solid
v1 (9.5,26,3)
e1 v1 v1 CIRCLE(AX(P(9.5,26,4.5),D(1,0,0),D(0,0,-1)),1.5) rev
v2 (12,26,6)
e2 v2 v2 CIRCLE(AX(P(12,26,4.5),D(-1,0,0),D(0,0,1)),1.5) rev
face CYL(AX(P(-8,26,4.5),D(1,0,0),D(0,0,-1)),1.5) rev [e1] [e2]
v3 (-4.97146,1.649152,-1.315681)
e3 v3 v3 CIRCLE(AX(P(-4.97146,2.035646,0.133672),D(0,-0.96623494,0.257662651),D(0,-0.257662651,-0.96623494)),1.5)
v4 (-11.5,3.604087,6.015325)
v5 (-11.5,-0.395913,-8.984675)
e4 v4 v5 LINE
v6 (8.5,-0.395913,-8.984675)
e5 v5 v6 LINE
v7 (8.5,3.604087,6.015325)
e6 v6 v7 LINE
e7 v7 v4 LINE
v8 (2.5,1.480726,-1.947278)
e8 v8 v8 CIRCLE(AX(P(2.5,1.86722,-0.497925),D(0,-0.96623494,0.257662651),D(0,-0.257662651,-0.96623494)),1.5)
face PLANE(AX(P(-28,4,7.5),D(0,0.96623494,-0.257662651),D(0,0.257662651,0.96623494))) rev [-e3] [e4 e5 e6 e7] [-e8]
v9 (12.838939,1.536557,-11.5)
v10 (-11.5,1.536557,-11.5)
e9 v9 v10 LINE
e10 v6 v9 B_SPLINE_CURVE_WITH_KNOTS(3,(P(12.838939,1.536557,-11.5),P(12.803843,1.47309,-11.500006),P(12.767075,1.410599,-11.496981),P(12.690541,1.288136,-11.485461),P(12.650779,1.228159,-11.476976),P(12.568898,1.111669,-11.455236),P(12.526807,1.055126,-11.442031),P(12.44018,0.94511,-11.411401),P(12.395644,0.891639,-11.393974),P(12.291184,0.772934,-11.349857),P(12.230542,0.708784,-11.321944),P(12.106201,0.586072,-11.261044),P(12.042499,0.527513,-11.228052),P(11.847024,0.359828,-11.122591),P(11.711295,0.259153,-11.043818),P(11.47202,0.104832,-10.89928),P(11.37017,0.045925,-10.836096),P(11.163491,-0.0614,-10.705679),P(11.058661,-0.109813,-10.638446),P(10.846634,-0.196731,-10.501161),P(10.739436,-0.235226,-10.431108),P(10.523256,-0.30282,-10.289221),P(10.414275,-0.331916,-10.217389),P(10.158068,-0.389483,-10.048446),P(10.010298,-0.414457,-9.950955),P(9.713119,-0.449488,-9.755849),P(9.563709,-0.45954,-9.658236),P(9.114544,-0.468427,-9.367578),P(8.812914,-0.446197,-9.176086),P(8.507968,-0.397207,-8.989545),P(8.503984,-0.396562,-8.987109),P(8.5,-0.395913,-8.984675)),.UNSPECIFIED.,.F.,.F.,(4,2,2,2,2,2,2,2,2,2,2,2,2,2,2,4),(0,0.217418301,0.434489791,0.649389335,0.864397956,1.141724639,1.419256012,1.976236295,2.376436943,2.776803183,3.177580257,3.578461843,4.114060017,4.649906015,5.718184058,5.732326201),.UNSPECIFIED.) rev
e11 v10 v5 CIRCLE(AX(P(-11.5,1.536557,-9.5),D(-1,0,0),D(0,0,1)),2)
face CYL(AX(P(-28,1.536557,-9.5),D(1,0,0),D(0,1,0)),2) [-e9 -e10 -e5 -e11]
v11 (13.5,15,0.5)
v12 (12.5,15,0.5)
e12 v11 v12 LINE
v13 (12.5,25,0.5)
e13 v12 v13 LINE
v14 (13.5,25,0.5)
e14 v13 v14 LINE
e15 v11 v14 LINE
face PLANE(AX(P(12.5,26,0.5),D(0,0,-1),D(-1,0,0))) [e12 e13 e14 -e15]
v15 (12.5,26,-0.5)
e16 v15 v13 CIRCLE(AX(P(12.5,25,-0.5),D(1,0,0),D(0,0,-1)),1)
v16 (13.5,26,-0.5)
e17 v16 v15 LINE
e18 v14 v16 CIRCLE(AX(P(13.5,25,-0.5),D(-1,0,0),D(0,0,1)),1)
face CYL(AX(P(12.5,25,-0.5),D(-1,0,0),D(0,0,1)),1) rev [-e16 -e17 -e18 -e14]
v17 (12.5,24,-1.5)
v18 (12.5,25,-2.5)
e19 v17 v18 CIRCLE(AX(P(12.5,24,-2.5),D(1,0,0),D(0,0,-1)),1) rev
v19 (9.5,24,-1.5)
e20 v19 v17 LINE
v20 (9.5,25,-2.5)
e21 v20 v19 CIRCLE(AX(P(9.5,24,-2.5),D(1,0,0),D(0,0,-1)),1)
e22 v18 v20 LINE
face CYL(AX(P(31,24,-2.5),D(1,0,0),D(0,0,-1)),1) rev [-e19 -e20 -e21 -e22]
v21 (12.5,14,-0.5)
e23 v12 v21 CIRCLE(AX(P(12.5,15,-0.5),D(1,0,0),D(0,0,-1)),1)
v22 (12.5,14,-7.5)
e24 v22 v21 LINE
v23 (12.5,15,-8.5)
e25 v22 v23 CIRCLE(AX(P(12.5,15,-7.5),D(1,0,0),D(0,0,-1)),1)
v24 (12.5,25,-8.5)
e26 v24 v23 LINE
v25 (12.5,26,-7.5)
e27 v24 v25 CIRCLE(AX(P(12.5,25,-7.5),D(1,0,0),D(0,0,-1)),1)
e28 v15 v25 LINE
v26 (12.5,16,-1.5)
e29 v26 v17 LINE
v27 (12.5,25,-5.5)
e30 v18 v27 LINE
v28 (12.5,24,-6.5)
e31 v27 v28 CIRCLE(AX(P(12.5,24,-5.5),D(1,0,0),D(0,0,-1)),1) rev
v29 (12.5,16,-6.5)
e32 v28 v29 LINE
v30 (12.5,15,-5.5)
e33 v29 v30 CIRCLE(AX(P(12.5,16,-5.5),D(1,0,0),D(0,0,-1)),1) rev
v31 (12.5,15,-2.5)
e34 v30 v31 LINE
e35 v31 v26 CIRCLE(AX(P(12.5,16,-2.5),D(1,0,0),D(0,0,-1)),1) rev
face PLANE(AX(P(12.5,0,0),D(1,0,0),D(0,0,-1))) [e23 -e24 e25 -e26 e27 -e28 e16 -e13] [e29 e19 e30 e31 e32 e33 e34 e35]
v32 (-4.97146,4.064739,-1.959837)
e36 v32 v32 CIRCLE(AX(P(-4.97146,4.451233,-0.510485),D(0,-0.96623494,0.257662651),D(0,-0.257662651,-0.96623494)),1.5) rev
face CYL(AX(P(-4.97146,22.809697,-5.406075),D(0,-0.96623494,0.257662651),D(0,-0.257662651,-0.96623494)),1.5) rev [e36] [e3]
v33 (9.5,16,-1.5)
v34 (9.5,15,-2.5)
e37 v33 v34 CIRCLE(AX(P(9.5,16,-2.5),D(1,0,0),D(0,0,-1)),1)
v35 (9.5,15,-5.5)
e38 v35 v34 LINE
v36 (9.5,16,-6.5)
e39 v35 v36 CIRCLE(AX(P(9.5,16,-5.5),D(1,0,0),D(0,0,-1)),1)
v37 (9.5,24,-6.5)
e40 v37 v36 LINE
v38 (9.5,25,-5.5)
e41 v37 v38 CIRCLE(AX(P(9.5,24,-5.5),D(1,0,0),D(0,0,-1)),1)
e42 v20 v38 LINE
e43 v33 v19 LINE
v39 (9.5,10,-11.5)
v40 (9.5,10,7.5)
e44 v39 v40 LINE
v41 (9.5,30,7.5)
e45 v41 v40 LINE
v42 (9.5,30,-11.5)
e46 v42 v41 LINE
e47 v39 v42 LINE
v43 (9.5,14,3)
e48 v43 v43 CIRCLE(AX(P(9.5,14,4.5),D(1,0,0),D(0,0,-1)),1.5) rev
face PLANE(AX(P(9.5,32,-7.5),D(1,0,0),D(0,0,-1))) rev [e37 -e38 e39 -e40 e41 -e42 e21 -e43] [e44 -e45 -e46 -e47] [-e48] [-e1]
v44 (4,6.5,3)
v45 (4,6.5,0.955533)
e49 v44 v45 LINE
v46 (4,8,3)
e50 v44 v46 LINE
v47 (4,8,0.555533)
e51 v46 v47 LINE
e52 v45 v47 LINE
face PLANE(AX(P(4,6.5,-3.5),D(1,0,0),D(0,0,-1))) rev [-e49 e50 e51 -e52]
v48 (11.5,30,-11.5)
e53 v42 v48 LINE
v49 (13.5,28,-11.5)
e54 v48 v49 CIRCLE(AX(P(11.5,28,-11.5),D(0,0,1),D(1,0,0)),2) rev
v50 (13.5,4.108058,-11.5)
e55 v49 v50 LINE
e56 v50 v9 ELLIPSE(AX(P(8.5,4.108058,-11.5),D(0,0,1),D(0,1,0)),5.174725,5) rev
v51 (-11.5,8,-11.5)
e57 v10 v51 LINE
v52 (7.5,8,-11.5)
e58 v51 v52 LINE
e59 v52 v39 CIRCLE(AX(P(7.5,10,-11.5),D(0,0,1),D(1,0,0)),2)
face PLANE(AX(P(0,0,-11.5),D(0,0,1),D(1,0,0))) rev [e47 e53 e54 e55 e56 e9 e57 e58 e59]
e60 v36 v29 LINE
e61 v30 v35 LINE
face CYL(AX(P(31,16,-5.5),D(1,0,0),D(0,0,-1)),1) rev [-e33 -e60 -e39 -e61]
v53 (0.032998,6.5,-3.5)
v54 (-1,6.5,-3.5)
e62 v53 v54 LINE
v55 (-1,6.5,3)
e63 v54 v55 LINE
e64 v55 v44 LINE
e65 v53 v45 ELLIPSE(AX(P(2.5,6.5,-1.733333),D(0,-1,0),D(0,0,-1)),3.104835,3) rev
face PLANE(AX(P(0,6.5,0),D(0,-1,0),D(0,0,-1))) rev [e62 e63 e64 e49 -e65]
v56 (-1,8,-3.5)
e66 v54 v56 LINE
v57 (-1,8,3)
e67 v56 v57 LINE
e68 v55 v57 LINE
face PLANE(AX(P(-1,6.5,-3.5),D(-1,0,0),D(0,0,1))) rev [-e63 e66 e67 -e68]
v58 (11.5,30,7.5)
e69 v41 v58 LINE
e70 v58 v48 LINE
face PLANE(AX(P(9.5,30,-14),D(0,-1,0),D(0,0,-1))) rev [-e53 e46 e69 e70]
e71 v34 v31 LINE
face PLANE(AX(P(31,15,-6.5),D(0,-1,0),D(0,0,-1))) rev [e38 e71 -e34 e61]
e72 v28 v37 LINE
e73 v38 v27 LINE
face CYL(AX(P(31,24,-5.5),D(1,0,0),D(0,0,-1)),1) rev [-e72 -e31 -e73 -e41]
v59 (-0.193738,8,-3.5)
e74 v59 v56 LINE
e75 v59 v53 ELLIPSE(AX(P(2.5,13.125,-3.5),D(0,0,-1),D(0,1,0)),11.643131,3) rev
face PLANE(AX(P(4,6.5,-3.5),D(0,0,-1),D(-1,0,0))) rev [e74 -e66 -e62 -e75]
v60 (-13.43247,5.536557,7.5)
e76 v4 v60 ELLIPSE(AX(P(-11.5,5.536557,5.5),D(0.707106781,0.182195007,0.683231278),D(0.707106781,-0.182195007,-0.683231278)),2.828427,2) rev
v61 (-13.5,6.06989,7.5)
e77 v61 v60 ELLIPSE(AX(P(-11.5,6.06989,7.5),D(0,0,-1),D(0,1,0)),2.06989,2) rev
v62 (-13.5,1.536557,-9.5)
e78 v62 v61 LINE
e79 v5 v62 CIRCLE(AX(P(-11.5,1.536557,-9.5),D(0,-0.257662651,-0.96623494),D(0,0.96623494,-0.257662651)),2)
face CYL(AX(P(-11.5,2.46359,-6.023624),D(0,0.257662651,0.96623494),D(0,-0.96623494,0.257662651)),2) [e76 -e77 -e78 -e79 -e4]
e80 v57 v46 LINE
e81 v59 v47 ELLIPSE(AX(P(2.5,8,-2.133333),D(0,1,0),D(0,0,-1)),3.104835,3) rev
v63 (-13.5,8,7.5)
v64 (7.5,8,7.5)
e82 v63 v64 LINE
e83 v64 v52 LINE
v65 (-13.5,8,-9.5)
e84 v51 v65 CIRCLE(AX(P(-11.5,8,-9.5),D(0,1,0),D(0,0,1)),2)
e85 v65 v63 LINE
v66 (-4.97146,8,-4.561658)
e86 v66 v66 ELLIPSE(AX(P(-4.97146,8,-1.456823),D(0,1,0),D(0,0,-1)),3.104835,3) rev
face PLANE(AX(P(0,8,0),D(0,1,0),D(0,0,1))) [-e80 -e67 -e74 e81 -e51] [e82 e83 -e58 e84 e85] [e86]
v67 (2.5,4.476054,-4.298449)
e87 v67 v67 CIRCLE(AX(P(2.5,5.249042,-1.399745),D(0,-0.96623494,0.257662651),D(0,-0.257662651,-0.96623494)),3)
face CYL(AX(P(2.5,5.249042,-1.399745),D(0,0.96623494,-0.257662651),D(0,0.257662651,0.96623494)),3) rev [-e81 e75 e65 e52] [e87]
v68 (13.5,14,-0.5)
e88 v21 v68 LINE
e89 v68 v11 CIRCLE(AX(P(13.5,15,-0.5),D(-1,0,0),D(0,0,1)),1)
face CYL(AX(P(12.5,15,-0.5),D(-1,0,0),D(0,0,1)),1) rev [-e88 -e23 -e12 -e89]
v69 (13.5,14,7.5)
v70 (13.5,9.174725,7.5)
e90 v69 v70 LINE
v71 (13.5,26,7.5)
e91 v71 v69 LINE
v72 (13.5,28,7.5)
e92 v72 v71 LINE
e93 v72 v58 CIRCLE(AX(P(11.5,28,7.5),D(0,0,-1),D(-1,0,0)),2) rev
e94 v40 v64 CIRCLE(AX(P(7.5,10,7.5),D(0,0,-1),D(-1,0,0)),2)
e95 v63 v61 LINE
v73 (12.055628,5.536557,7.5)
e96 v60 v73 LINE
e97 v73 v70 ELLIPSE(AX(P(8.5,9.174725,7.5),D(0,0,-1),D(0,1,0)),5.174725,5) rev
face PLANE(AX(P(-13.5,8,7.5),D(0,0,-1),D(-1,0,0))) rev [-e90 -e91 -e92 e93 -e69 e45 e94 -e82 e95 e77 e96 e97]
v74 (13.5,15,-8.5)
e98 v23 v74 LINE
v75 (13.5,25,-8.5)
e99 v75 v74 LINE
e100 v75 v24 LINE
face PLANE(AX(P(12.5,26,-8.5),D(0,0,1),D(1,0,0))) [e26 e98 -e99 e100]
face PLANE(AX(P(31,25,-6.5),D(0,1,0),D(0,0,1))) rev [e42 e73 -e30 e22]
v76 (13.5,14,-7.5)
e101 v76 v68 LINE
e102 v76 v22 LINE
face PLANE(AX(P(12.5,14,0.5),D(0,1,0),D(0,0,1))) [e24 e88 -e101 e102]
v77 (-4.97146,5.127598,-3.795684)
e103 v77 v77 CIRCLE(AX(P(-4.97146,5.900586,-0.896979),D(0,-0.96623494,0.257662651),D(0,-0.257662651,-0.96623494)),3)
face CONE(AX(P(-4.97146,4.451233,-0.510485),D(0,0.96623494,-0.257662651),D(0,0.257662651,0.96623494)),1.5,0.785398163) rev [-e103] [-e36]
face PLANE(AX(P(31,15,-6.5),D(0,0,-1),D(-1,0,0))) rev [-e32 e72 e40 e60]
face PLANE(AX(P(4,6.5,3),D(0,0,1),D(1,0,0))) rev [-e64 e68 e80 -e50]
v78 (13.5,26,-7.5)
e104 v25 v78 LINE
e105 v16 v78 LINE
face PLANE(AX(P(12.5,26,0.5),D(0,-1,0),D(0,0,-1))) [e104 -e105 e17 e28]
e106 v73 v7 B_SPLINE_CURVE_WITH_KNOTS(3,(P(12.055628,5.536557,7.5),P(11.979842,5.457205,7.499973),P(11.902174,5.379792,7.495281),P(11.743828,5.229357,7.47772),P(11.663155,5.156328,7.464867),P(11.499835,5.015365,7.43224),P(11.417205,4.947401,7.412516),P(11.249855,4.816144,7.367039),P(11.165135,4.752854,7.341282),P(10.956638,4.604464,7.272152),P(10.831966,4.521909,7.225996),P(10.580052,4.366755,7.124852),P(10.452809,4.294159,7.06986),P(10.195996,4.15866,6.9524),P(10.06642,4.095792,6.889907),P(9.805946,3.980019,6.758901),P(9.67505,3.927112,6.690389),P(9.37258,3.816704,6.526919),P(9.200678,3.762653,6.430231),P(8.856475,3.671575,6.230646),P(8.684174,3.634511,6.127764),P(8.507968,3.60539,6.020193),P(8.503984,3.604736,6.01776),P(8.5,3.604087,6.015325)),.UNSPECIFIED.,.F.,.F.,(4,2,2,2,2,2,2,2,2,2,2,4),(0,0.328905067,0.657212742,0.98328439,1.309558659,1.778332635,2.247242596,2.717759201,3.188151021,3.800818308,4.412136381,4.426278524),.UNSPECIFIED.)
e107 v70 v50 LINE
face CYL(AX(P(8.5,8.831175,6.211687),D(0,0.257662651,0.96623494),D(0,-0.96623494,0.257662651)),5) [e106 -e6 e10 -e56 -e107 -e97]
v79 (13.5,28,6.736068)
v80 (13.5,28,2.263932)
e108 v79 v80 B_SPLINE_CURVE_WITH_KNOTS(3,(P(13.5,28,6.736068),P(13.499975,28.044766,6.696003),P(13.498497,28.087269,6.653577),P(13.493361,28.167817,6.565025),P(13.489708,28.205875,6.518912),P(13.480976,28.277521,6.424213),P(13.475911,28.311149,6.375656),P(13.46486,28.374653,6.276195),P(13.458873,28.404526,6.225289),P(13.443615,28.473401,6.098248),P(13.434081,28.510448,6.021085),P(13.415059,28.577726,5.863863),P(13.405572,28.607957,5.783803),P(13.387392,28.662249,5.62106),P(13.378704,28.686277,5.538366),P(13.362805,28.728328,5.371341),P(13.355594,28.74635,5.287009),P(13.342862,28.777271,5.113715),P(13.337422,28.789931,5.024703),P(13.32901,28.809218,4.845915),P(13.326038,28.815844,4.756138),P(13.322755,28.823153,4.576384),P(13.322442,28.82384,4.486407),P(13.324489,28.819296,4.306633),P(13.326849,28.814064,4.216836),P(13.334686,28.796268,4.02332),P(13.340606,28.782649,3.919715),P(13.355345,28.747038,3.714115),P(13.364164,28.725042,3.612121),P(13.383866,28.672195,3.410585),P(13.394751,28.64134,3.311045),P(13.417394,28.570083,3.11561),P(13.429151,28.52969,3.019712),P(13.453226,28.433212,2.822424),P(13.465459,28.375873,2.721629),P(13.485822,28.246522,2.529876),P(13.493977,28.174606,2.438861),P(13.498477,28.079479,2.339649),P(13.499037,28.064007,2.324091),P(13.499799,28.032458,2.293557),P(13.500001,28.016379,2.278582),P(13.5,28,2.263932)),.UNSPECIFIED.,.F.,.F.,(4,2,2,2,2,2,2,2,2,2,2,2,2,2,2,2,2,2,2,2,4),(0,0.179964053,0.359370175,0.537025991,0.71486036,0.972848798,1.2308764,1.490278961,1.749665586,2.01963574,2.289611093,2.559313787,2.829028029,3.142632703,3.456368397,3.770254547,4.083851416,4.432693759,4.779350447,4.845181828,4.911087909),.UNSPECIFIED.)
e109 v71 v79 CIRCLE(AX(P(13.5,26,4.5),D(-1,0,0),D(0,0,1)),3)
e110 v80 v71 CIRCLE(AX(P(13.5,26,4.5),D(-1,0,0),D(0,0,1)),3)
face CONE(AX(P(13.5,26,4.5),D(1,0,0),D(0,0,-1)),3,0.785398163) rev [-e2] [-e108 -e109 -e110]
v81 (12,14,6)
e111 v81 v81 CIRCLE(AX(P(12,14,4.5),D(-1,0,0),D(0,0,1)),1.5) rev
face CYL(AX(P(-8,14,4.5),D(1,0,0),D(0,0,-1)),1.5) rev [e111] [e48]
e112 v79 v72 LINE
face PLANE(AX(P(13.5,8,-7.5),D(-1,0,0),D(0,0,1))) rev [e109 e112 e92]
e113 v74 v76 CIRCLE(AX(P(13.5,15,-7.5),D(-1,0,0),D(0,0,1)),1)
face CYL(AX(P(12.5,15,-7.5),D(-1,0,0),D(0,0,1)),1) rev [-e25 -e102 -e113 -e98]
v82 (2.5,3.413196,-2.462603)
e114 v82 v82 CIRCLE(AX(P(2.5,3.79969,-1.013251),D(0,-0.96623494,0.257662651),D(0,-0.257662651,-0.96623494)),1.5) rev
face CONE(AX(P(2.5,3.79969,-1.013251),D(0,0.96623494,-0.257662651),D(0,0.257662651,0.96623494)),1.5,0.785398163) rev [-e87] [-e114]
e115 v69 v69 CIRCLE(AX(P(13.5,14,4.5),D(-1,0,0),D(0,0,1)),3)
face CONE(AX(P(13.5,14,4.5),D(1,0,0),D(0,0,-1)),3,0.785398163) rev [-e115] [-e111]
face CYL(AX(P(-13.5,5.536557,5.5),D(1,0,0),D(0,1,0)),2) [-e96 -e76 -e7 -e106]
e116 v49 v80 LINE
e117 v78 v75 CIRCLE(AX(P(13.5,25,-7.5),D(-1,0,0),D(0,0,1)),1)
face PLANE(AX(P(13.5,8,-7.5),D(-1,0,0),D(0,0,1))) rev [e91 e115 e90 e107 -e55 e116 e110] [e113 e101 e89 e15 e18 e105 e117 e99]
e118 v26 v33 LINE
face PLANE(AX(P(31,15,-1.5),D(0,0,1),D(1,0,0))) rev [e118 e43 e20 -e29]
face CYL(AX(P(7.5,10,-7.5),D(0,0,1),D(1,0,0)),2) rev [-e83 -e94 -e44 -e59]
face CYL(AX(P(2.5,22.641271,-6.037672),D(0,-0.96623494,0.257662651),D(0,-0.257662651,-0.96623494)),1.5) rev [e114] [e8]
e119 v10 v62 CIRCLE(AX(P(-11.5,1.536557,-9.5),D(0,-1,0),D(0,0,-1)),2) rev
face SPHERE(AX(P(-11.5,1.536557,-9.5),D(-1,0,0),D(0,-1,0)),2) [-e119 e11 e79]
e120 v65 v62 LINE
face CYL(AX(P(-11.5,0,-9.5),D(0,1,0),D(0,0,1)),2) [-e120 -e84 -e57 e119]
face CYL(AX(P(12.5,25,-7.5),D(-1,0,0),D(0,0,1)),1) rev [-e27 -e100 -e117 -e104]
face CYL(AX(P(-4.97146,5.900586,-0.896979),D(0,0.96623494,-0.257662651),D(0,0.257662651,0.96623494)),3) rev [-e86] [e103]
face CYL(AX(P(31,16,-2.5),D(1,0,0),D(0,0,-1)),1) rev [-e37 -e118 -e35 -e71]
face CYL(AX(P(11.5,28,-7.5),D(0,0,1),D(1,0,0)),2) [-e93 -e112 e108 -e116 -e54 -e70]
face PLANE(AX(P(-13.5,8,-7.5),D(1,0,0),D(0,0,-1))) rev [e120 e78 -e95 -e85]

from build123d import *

# Parameters (mm, degrees)
SKETCH_1_W                = 27
SKETCH_1_H                = 15
EXTRUDE_1_DEPTH           = 8
CUT_EXTRUDE_8_DEPTH       = 41.5
SKETCH_5_W                = 4
SKETCH_5_H                = 15
EXTRUDE_3_DEPTH           = 24
SKETCH_7_W                = 5
SKETCH_7_H                = 6.5
CUT_EXTRUDE_5_DEPTH       = 1.5
SKETCH_10_R               = 1.5
CUT_EXTRUDE_6_DEPTH       = 21.5
SKETCH_12_W               = 5
SKETCH_12_H               = 10
CUT_EXTRUDE_7_DEPTH       = 21.5
SKETCH_14_W               = 4
SKETCH_14_H               = 2
CUT_EXTRUDE_9_DEPTH       = 21.5
SKETCH_15_R               = 1.5
CUT_EXTRUDE_10_DEPTH      = 21.5
EXTRUDE_6_DEPTH           = 4
CUT_EXTRUDE_13_DEPTH      = 1.5
CUT_EXTRUDE_13_DEPTH_BACK = 12
SKETCH_17_R               = 3
CUT_EXTRUDE_15_DEPTH      = 1
CUT_EXTRUDE_15_DEPTH_BACK = 2.5
SKETCH_19_R               = 3
CUT_EXTRUDE_16_DEPTH      = 54
SKETCH_23_W               = 9
SKETCH_23_H               = 12
CUT_EXTRUDE_17_DEPTH      = 1
FILLET_2_R                = 2
FILLET_3_R                = 2
FILLET_4_R                = 5
CHAMFER_1_SIZE            = 1.5
FILLET_5_R                = 2
FILLET_8_R                = 1


with BuildPart() as part:
    # 草图1 → 凸台-拉伸1 (new body)
    with BuildSketch(Plane(origin=(0, 0, 0), x_dir=(1, 0, 0), z_dir=(0, 1, 0))):
        Rectangle(SKETCH_1_W, SKETCH_1_H)
    extrude(amount=EXTRUDE_1_DEPTH)

    # 草图13 → 切除-拉伸8 (cut)
    with BuildSketch(Plane(origin=(13.5, 0, 0), x_dir=(0, 0, -1), z_dir=(1, 0, 0))):
        Polygon((-7.5, 4), (7.5, 0), (-7.5, 0), align=None)
    extrude(amount=-CUT_EXTRUDE_8_DEPTH, mode=Mode.SUBTRACT)

    # 草图5 → 凸台-拉伸3 (add)
    with BuildSketch(Plane(origin=(0, 8, 0), x_dir=(1, 0, 0), z_dir=(0, 1, 0))):
        with Locations((11.5, 0)):
            Rectangle(SKETCH_5_W, SKETCH_5_H)
    extrude(amount=EXTRUDE_3_DEPTH)

    # 草图7 → 切除-拉伸5 (cut)
    with BuildSketch(Plane(origin=(0, 8, 0), x_dir=(1, 0, 0), z_dir=(0, 1, 0))):
        with Locations((1.5, 0.25)):
            Rectangle(SKETCH_7_W, SKETCH_7_H)
    extrude(amount=-CUT_EXTRUDE_5_DEPTH, mode=Mode.SUBTRACT)

    # 草图10 → 切除-拉伸6 (cut)
    with BuildSketch(Plane.ZY.offset(-13.5)):
        with Locations(Location((4.5, 14, 0), (0, 0, 180))):
            Circle(SKETCH_10_R)
        with Locations(Location((4.5, 26, 0), (0, 0, 180))):
            Circle(SKETCH_10_R)
    extrude(amount=CUT_EXTRUDE_6_DEPTH, mode=Mode.SUBTRACT)

    # 草图12 → 切除-拉伸7 (cut)
    with BuildSketch(Plane.ZY.offset(-9.5)):
        with Locations((-4, 20)):
            Rectangle(SKETCH_12_W, SKETCH_12_H)
    extrude(amount=-CUT_EXTRUDE_7_DEPTH, mode=Mode.SUBTRACT)

    # 草图14 → 切除-拉伸9 (cut)
    with BuildSketch(Plane.XY.offset(7.5)):
        with Locations((11.5, 31)):
            Rectangle(SKETCH_14_W, SKETCH_14_H)
    extrude(amount=-CUT_EXTRUDE_9_DEPTH, mode=Mode.SUBTRACT)

    # 草图15 → 切除-拉伸10 (cut)
    with BuildSketch(Plane(origin=(0, 1.867219917, -0.497925311), x_dir=(1, 0, 0), z_dir=(0, -0.9662349396012463, 0.25766265056033233))):
        with Locations(Location((-4.971460236, 0.653668071, 0), (0, 0, 270))):
            Circle(SKETCH_15_R)
        with Locations(Location((2.5, 0, 0), (0, 0, 270))):
            Circle(SKETCH_15_R)
    extrude(amount=-CUT_EXTRUDE_10_DEPTH, mode=Mode.SUBTRACT)

    # 草图21 → 凸台-拉伸6 (add)
    with BuildSketch(Plane(origin=(0, 0, -7.5), x_dir=(-1, 0, 0), z_dir=(0, 0, -1))):
        Polygon((-13.5, -1.987071707), (11.82839978, -1.987071707), (13.5, -1.987071707), (13.5, 8), (-9.5, 8), (-9.5, 30), (-13.5, 30), (-13.5, 8), align=None)
    extrude(amount=EXTRUDE_6_DEPTH)

    # 草图17 → 切除-拉伸13 (cut, two sides: drawn at the far end of the back side and taken through both)
    with BuildSketch(Plane(origin=(0, 6.698394615, -1.786238564), x_dir=(-1, 0, 0), z_dir=(0, -0.9662349396012463, 0.25766265056033233)).offset(-CUT_EXTRUDE_13_DEPTH_BACK)):
        with Locations(Location((-2.5, 0, 0), (0, 0, 240))):
            Circle(SKETCH_17_R)
    extrude(amount=CUT_EXTRUDE_13_DEPTH + CUT_EXTRUDE_13_DEPTH_BACK, mode=Mode.SUBTRACT)

    # 草图19 → 切除-拉伸15 (cut, two sides: drawn at the far end of the back side and taken through both)
    with BuildSketch(Plane(origin=(0, 6.698394615, -1.786238564), x_dir=(-1, 0, 0), z_dir=(0, -0.9662349396012463, 0.25766265056033233)).offset(-CUT_EXTRUDE_15_DEPTH_BACK)):
        with Locations(Location((4.971460236, -0.653668071, 0), (0, 0, 90))):
            Circle(SKETCH_19_R)
    extrude(amount=CUT_EXTRUDE_15_DEPTH + CUT_EXTRUDE_15_DEPTH_BACK, mode=Mode.SUBTRACT)

    # 草图22 → 切除-拉伸16 (cut)
    with BuildSketch(Plane(origin=(13.5, 0, 0), x_dir=(0, 0, -1), z_dir=(1, 0, 0))):
        Polygon((-7.5, 4), (7.5, 0), (11.5, -1.066666667), (11.5, -3.267506917), (3.736378374, -2.578943079), align=None)
    extrude(amount=-CUT_EXTRUDE_16_DEPTH, mode=Mode.SUBTRACT)

    # 草图23 → 切除-拉伸17 (cut)
    with BuildSketch(Plane.ZY.offset(-13.5)):
        with Locations((-4, 20)):
            Rectangle(SKETCH_23_W, SKETCH_23_H)
    extrude(amount=CUT_EXTRUDE_17_DEPTH, mode=Mode.SUBTRACT)

    # 圆角2
    fillet_2_edges = [part.edges().sort_by_distance(p)[0] for p in [
        (9.5, 8, -2),
    ]]
    fillet(fillet_2_edges, radius=FILLET_2_R)

    # 圆角3
    fillet_3_edges = [part.edges().sort_by_distance(p)[0] for p in [
        (13.5, 30, -2),
    ]]
    fillet(fillet_3_edges, radius=FILLET_3_R)

    # 圆角4
    fillet_4_edges = [part.edges().sort_by_distance(p)[0] for p in [
        (13.5, 1.466666667, -2),
    ]]
    fillet(fillet_4_edges, radius=FILLET_4_R)

    # 倒角1
    # the kernel refuses this chamfer: 1.5 mm, written as the material it takes off along each edge
    with BuildSketch(Plane(origin=(2.5, 5.249042206, -1.399744588), x_dir=(0, -0.2576626505603323, -0.9662349396012463), z_dir=(-1, 0, 0))) as chamfer_1_piece_1_section:
        Polygon((1.5, CHAMFER_1_SIZE), (1.5 + CHAMFER_1_SIZE, 0), (1.5, 0), align=None)
    chamfer_1_piece_1 = revolve(axis=Axis((2.5, 5.249042206, -1.399744588), (0, -0.9662349396012463, 0.25766265056033233)), mode=Mode.PRIVATE)
    chamfer_1_piece_1 = chamfer_1_piece_1 & Plane(origin=(2.5, 4.520895406, -1.205572108), x_dir=(0.5000000000000004, 0.22314240099168048, 0.8367840037188018), z_dir=(0, -0.9662349396012463, 0.25766265056033233)) * Cylinder(3, 12, mode=Mode.PRIVATE)
    add(chamfer_1_piece_1, mode=Mode.SUBTRACT)
    with BuildSketch(Plane(origin=(-4.971460236, 5.900585523, -0.896978985), x_dir=(0, -0.25766265056033244, -0.9662349396012462), z_dir=(-1, 0, 0))) as chamfer_1_piece_2_section:
        Polygon((1.5, CHAMFER_1_SIZE), (1.5 + CHAMFER_1_SIZE, 0), (1.5, 0), align=None)
    chamfer_1_piece_2 = revolve(axis=Axis((-4.971460236, 5.900585523, -0.896978985), (0, -0.9662349396012463, 0.25766265056033233)), mode=Mode.PRIVATE)
    chamfer_1_piece_2 = chamfer_1_piece_2 & Plane(origin=(-4.971460236, 5.172438723, -0.702806505), x_dir=(0, -0.25766265056033233, -0.9662349396012463), z_dir=(0, 0.9662349396012463, -0.25766265056033233)) * Cylinder(3, 13, mode=Mode.PRIVATE)
    add(chamfer_1_piece_2, mode=Mode.SUBTRACT)
    with BuildSketch(Plane(origin=(13.5, 14, 4.5), x_dir=(0, 0, -1), z_dir=(0, 1, 0))) as chamfer_1_piece_3:
        Polygon((1.5 + CHAMFER_1_SIZE, 0), (1.5, CHAMFER_1_SIZE), (1.5, 0), align=None)
    revolve(axis=Axis((13.5, 14, 4.5), (-1, 0, 0)), mode=Mode.SUBTRACT)
    with BuildSketch(Plane(origin=(13.5, 26, 4.5), x_dir=(0, 0, -1), z_dir=(0, 1, 0))) as chamfer_1_piece_4:
        Polygon((1.5 + CHAMFER_1_SIZE, 0), (1.5, CHAMFER_1_SIZE), (1.5, 0), align=None)
    revolve(axis=Axis((13.5, 26, 4.5), (-1, 0, 0)), mode=Mode.SUBTRACT)

    # 圆角5
    # the kernel refuses this fillet: 2 mm, written as the material it takes off along each edge
    with BuildSketch(Plane(origin=(-11.5, 1.536556626, -9.5), x_dir=(0, 0, -1), z_dir=(-1, 0, 0))) as fillet_5_piece_1_section:
        Polygon((0, 0), (FILLET_5_R * 1.02, 0), (FILLET_5_R * 1.02, FILLET_5_R * 1.32764387935), (-FILLET_5_R * 0.262815903572, FILLET_5_R * 0.985559638393), align=None)
    fillet_5_piece_1 = extrude(amount=FILLET_5_R * 1.02, mode=Mode.PRIVATE)
    fillet_5_piece_1 = fillet_5_piece_1 - Plane(origin=(-11.5, 1.536556626, -9.5), x_dir=(0, 0.7929888557099438, 0.6092361403592483), z_dir=(-1, 0, 0)) * Sphere(FILLET_5_R, mode=Mode.PRIVATE)
    add(fillet_5_piece_1, mode=Mode.SUBTRACT)
    with BuildSketch(Plane(origin=(-13.5, -0.395913253, -8.984674699), x_dir=(1, 0, 0), z_dir=(0, 0.2576626505603323, 0.9662349396012463))) as fillet_5_piece_2:
        with BuildLine():
            CenterArc((FILLET_5_R, FILLET_5_R), FILLET_5_R, 180, 90)
            Line((0, FILLET_5_R), (0, 0))
            Line((0, 0), (FILLET_5_R, 0))
        make_face()
    extrude(amount=22.060731322, mode=Mode.SUBTRACT)
    with BuildSketch(Plane(origin=(12.341391565, 4, 7.5), x_dir=(0, 1, 0), z_dir=(-1, 0, 0))) as fillet_5_piece_3:
        with BuildLine():
            CenterArc((FILLET_5_R * 0.768278313084, FILLET_5_R), FILLET_5_R, 194.931417178, 75.068582822)
            Line((-FILLET_5_R * 0.197956626517, FILLET_5_R * 0.74233734944), (0, 0))
            Line((0, 0), (FILLET_5_R * 0.768278313084, 0))
        make_face()
    extrude(amount=29.682783131, mode=Mode.SUBTRACT)
    with BuildSketch(Plane(origin=(15.008058232, -1.066666667, -11.5), x_dir=(0, 0.25766265056033255, 0.9662349396012463), z_dir=(-1, 0, 0))) as fillet_5_piece_4:
        with BuildLine():
            CenterArc((FILLET_5_R * 1.30161164642, FILLET_5_R), FILLET_5_R, 165.068582822, 104.931417178)
            Line((FILLET_5_R * 0.335376706816, FILLET_5_R * 1.25766265056), (0, 0))
            Line((0, 0), (FILLET_5_R * 1.30161164642, 0))
        make_face()
    extrude(amount=26.508058232, mode=Mode.SUBTRACT)
    with BuildSketch(Plane(origin=(-13.5, 1.536556626, -11.5), x_dir=(0, 0, 1), z_dir=(0, 1, 0))) as fillet_5_piece_5:
        with BuildLine():
            CenterArc((FILLET_5_R, FILLET_5_R), FILLET_5_R, 180, 90)
            Line((0, FILLET_5_R), (0, 0))
            Line((0, 0), (FILLET_5_R, 0))
        make_face()
    extrude(amount=11.463443374, mode=Mode.SUBTRACT)

    # 圆角8
    fillet_8_edges = [part.edges().sort_by_distance(p)[0] for p in [
        (11, 25, -1.5),
        (11, 25, -6.5),
        (11, 15, -6.5),
        (11, 15, -1.5),
        (13, 14, 0.5),
        (13, 26, 0.5),
        (13, 26, -8.5),
        (13, 14, -8.5),
    ]]
    fillet(fillet_8_edges, radius=FILLET_8_R)


solid = part.part
